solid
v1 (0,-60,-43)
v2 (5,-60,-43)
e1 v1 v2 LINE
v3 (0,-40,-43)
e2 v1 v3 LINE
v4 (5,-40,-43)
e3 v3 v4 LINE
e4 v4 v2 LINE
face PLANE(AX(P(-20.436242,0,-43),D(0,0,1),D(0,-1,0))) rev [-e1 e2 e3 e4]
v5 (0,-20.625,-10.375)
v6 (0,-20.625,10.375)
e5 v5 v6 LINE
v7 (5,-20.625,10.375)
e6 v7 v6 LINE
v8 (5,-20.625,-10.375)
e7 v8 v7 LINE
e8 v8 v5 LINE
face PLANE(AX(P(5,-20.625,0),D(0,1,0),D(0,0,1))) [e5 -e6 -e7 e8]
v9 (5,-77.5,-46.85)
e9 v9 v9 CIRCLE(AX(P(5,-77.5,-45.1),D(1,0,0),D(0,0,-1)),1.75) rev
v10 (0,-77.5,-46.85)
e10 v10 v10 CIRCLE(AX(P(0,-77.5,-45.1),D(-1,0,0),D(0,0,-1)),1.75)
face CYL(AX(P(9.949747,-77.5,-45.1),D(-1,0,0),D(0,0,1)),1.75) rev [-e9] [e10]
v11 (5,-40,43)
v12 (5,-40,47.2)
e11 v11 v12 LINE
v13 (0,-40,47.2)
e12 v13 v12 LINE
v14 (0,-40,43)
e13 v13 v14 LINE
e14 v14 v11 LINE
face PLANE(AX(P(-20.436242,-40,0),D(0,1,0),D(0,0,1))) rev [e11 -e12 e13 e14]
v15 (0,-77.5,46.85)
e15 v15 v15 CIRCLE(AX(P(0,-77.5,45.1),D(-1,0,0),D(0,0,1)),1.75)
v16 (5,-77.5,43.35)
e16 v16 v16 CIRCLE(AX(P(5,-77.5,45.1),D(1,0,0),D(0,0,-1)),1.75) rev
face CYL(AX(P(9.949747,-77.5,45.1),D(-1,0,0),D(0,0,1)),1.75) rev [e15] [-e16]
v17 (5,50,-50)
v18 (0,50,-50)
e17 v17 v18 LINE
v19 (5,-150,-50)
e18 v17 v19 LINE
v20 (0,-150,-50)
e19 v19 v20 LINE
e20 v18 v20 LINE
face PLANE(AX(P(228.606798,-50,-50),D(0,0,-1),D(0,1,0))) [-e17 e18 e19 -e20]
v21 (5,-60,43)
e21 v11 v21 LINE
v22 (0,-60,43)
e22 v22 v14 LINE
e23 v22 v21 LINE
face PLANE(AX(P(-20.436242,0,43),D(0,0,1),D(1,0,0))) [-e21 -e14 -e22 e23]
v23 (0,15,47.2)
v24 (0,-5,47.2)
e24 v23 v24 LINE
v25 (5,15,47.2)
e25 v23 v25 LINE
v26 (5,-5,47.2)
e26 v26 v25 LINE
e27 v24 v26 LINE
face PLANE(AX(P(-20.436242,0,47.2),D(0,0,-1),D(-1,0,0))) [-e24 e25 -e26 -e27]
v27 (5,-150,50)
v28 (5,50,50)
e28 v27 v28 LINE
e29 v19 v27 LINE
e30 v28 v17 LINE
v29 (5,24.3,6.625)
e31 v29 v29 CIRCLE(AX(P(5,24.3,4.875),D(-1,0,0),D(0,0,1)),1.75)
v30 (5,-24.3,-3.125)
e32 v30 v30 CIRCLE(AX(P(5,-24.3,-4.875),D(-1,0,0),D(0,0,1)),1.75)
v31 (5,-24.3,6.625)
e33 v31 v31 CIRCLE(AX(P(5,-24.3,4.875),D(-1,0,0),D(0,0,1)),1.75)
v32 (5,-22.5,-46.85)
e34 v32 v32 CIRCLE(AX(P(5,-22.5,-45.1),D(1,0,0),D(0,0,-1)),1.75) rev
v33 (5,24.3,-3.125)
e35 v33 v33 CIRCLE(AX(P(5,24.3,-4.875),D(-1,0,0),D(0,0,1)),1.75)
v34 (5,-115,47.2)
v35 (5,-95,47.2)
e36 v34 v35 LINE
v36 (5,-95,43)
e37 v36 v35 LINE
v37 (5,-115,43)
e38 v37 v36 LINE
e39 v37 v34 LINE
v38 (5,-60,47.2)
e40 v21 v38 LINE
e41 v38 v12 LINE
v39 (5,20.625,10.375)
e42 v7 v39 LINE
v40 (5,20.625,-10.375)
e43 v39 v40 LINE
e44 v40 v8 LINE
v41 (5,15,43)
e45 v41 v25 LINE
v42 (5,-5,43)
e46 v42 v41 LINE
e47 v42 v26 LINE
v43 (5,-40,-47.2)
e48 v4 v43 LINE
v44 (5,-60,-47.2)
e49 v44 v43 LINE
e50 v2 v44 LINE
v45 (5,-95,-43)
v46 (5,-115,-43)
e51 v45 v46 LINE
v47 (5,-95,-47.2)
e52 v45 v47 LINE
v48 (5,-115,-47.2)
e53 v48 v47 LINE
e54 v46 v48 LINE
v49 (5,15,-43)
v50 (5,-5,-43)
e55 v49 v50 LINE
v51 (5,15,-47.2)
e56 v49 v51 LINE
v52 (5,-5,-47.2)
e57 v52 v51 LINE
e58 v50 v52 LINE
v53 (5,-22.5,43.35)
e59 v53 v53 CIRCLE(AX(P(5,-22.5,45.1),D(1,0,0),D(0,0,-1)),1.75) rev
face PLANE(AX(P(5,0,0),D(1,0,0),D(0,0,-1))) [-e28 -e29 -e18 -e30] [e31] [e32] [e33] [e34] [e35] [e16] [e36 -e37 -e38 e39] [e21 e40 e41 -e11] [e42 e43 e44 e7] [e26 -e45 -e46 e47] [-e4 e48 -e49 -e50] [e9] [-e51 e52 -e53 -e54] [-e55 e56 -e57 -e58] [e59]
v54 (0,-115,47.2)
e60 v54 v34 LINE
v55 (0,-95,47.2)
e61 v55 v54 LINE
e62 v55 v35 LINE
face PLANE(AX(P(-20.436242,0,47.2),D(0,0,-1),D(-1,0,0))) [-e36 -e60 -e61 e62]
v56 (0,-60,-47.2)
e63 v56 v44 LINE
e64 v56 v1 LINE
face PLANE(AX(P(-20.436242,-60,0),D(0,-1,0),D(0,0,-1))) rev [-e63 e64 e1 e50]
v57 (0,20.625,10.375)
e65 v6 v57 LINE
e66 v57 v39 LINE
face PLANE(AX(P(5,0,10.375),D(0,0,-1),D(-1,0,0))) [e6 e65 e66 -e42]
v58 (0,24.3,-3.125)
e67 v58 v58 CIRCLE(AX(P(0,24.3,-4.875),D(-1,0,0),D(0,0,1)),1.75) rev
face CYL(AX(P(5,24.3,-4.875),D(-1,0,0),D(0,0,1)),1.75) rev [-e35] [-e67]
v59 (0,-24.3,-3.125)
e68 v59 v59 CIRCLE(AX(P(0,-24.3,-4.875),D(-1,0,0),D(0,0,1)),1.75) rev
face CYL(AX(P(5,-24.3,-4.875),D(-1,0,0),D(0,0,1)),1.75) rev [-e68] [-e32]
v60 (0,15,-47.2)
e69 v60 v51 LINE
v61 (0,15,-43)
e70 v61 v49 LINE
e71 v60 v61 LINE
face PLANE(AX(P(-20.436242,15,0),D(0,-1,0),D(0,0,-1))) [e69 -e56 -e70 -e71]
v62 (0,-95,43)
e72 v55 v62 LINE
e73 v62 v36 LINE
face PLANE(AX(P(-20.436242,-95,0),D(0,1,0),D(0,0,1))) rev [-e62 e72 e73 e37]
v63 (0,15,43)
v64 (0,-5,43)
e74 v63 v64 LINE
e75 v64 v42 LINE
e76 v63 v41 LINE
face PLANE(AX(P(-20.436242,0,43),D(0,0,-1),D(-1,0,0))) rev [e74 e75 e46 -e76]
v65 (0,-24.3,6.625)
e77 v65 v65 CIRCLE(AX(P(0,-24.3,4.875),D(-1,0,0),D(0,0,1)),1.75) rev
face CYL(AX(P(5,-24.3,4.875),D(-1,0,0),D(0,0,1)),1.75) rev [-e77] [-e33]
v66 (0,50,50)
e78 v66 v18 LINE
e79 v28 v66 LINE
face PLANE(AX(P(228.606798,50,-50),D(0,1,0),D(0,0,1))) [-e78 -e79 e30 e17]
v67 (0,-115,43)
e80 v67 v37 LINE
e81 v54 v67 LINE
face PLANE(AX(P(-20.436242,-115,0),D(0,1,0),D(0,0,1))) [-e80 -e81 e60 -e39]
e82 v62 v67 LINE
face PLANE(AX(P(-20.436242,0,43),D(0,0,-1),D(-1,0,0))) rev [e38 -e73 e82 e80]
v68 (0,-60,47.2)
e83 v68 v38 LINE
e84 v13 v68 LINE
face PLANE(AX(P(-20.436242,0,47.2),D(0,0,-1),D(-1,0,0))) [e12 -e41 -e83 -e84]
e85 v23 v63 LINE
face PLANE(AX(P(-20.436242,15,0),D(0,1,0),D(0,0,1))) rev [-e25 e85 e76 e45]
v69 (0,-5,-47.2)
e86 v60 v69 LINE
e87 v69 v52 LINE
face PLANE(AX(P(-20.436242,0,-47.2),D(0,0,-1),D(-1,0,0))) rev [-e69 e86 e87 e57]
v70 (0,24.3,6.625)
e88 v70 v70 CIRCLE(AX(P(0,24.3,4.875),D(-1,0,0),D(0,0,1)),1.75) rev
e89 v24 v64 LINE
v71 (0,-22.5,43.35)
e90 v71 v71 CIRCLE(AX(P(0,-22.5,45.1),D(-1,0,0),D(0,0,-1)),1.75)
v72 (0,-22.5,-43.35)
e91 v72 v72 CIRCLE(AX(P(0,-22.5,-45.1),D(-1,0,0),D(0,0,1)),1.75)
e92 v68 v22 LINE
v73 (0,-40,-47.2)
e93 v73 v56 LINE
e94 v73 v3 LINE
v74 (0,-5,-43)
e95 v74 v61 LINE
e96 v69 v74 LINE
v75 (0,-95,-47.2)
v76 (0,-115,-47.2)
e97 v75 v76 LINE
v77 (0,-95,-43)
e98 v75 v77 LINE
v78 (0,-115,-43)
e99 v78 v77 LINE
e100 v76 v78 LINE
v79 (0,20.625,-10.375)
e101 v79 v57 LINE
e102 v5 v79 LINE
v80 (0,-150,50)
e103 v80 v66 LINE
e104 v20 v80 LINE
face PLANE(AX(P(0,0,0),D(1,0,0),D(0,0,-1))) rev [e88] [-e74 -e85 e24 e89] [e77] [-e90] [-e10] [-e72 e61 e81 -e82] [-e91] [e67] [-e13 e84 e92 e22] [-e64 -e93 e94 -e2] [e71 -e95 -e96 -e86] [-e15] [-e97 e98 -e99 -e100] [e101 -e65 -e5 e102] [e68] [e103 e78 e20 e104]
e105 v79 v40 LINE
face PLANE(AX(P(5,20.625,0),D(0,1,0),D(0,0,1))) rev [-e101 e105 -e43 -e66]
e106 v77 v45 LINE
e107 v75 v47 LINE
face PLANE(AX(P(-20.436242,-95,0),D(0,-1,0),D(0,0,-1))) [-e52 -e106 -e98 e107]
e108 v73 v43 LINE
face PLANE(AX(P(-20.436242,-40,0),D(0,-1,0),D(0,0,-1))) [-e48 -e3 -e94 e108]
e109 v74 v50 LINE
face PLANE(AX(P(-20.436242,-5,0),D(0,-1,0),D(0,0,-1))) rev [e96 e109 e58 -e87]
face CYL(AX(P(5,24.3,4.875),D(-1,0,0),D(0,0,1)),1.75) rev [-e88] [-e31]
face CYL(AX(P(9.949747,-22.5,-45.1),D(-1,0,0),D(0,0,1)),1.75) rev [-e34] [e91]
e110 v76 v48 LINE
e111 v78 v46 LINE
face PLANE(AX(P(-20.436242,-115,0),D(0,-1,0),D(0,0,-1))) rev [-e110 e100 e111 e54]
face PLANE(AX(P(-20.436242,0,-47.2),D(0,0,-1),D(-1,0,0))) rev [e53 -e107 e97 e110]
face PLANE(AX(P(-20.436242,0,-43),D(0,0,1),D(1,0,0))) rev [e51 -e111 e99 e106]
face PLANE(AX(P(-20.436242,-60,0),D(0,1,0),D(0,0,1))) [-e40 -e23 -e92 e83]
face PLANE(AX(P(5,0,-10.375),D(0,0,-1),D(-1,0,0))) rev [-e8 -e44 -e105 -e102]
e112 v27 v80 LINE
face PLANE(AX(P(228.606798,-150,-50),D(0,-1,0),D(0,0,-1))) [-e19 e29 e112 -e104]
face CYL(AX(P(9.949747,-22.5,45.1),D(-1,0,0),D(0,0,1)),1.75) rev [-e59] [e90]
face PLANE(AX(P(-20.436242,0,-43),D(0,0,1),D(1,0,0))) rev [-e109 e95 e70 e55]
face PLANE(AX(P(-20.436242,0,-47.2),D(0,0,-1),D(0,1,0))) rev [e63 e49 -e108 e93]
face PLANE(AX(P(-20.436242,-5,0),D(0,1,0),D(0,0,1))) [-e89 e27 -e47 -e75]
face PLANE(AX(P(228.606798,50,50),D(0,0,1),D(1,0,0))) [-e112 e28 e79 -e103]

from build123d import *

# Parameters (mm, degrees)
CUT_EXTRUDE1_START     = -5
CUT_EXTRUDE1_OUTLINE_R = 1.75
CUT_EXTRUDE1_OUTLINE_W = 20.75
CUT_EXTRUDE1_OUTLINE_H = 41.25
CUT_EXTRUDE1_DEPTH     = 5
BOSS_EXTRUDE1_START    = -5
BOSS_EXTRUDE1_DEPTH    = 5
SKETCH4_W              = 30
SKETCH4_H              = 60
BOSS_EXTRUDE2_DEPTH    = 5
CUT_EXTRUDE2_REACH     = 160.193
SKETCH5_W              = 4.2
SKETCH5_H              = 20
CUT_EXTRUDE3_REACH     = 160.193
SKETCH6_R              = 1.75


with BuildPart() as part:
    # Cut-Extrude1: read off the stored shape, not the designer's step
    # Cut-Extrude1 outline → Cut-Extrude1 (new body)
    with BuildSketch(Plane(origin=(5, 0, 0), x_dir=(0, 0, -1), z_dir=(1, 0, 0)).offset(CUT_EXTRUDE1_START)):
        with BuildLine():
            Line((-6.17, -30), (6.17, -30))
            ThreePointArc((6.17, -30), (12.413752878, -27.413752878), (15, -21.17))
            Line((15, -21.17), (15, 21.17))
            ThreePointArc((15, 21.17), (12.413752878, 27.413752878), (6.17, 30))
            Line((6.17, 30), (-6.17, 30))
            ThreePointArc((-6.17, 30), (-12.413752878, 27.413752878), (-15, 21.17))
            Line((-15, 21.17), (-15, -21.17))
            ThreePointArc((-15, -21.17), (-12.413752878, -27.413752878), (-6.17, -30))
        make_face()
        with Locations((-4.875, -24.3)):
            Circle(CUT_EXTRUDE1_OUTLINE_R, mode=Mode.SUBTRACT)
        with Locations((4.875, -24.3)):
            Circle(CUT_EXTRUDE1_OUTLINE_R, mode=Mode.SUBTRACT)
        with Locations((-4.875, 24.3)):
            Circle(CUT_EXTRUDE1_OUTLINE_R, mode=Mode.SUBTRACT)
        Rectangle(CUT_EXTRUDE1_OUTLINE_W, CUT_EXTRUDE1_OUTLINE_H, mode=Mode.SUBTRACT)
        with Locations((4.875, 24.3)):
            Circle(CUT_EXTRUDE1_OUTLINE_R, mode=Mode.SUBTRACT)
    extrude(amount=CUT_EXTRUDE1_DEPTH)

    # Sketch2 → Boss-Extrude1 (add)
    with BuildSketch(Plane(origin=(5, 0, 0), x_dir=(0, 0, -1), z_dir=(1, 0, 0)).offset(BOSS_EXTRUDE1_START)):
        with BuildLine():
            Line((10.375, -20.625), (6.17, -20.625))
            Line((6.17, -20.625), (6.17, -21.93080825))
            Line((6.17, -21.93080825), (7.268440243, -21.93080825))
            Line((7.268440243, -21.93080825), (7.268440243, -27.341819789))
            Line((7.268440243, -27.341819789), (6.17, -27.341819789))
            Line((6.17, -27.341819789), (6.17, -30))
            ThreePointArc((6.17, -30), (12.413752878, -27.413752878), (15, -21.17))
            Line((15, -21.17), (15, 21.17))
            ThreePointArc((15, 21.17), (12.413752878, 27.413752878), (6.17, 30))
            Line((6.17, 30), (6.17, 26.982507006))
            Line((6.17, 26.982507006), (7.710578553, 26.982507006))
            Line((7.710578553, 26.982507006), (7.710578553, 21.584637872))
            Line((7.710578553, 21.584637872), (6.17, 21.584637872))
            Line((6.17, 21.584637872), (6.17, 20.625))
            Line((6.17, 20.625), (10.375, 20.625))
            Line((10.375, 20.625), (10.375, -20.625))
        make_face()
        with BuildLine():
            Line((-8.472684232, -21.93080825), (-6.17, -21.93080825))
            Line((-6.17, -21.93080825), (-6.17, -20.625))
            Line((-6.17, -20.625), (-10.375, -20.625))
            Line((-10.375, -20.625), (-10.375, 20.625))
            Line((-10.375, 20.625), (-6.17, 20.625))
            Line((-6.17, 20.625), (-6.17, 21.584637872))
            Line((-6.17, 21.584637872), (-7.710578553, 21.584637872))
            Line((-7.710578553, 21.584637872), (-7.710578553, 26.982507006))
            Line((-7.710578553, 26.982507006), (-6.17, 26.982507006))
            Line((-6.17, 26.982507006), (-6.17, 30))
            ThreePointArc((-6.17, 30), (-12.413752878, 27.413752878), (-15, 21.17))
            Line((-15, 21.17), (-15, -21.17))
            ThreePointArc((-15, -21.17), (-12.413752878, -27.413752878), (-6.17, -30))
            Line((-6.17, -30), (-6.17, -27.341819789))
            Line((-6.17, -27.341819789), (-8.472684232, -27.341819789))
            Line((-8.472684232, -27.341819789), (-8.472684232, -21.93080825))
        make_face()
        with BuildLine():
            Line((-15, 30), (-15, 21.17))
            ThreePointArc((-15, 21.17), (-12.413752878, 27.413752878), (-6.17, 30))
            Line((-6.17, 30), (-15, 30))
        make_face()
        with BuildLine():
            Line((15, 30), (6.17, 30))
            ThreePointArc((6.17, 30), (12.413752878, 27.413752878), (15, 21.17))
            Line((15, 21.17), (15, 30))
        make_face()
        with BuildLine():
            ThreePointArc((15, -21.17), (12.413752878, -27.413752878), (6.17, -30))
            Line((6.17, -30), (15, -30))
            Line((15, -30), (15, -21.17))
        make_face()
        with BuildLine():
            Line((-15, -30), (-6.17, -30))
            ThreePointArc((-6.17, -30), (-12.413752878, -27.413752878), (-15, -21.17))
            Line((-15, -21.17), (-15, -30))
        make_face()
    extrude(amount=BOSS_EXTRUDE1_DEPTH)

    # Sketch4 → Boss-Extrude2 (add)
    with BuildSketch(Plane.ZY):
        Polygon((-50, 50), (50, 50), (50, -50), (50, -150), (-50, -150), (-50, -50), align=None)
        Rectangle(SKETCH4_W, SKETCH4_H, mode=Mode.SUBTRACT)
    extrude(amount=-BOSS_EXTRUDE2_DEPTH)

    # Sketch5 → Cut-Extrude2 (cut, up to next)
    with BuildSketch(Plane(origin=(5, 0, 0), x_dir=(0, 0, -1), z_dir=(1, 0, 0)), mode=Mode.PRIVATE) as cut_extrude2_sk1:
        with Locations((45.1, -105)):
            Rectangle(SKETCH5_W, SKETCH5_H)
    cut_extrude2_tool1 = extrude(cut_extrude2_sk1.sketch, amount=-CUT_EXTRUDE2_REACH, mode=Mode.PRIVATE) & part.part
    # Sketch5 → Cut-Extrude2 (cut, up to next)
    with BuildSketch(Plane(origin=(5, 0, 0), x_dir=(0, 0, -1), z_dir=(1, 0, 0)), mode=Mode.PRIVATE) as cut_extrude2_sk2:
        with Locations((45.1, -50)):
            Rectangle(SKETCH5_W, SKETCH5_H)
    cut_extrude2_tool2 = extrude(cut_extrude2_sk2.sketch, amount=-CUT_EXTRUDE2_REACH, mode=Mode.PRIVATE) & part.part
    # Sketch5 → Cut-Extrude2 (cut, up to next)
    with BuildSketch(Plane(origin=(5, 0, 0), x_dir=(0, 0, -1), z_dir=(1, 0, 0)), mode=Mode.PRIVATE) as cut_extrude2_sk3:
        with Locations((45.1, 5)):
            Rectangle(SKETCH5_W, SKETCH5_H)
    cut_extrude2_tool3 = extrude(cut_extrude2_sk3.sketch, amount=-CUT_EXTRUDE2_REACH, mode=Mode.PRIVATE) & part.part
    # Sketch5 → Cut-Extrude2 (cut, up to next)
    with BuildSketch(Plane(origin=(5, 0, 0), x_dir=(0, 0, -1), z_dir=(1, 0, 0)), mode=Mode.PRIVATE) as cut_extrude2_sk4:
        with Locations((-45.1, 5)):
            Rectangle(SKETCH5_W, SKETCH5_H)
    cut_extrude2_tool4 = extrude(cut_extrude2_sk4.sketch, amount=-CUT_EXTRUDE2_REACH, mode=Mode.PRIVATE) & part.part
    # Sketch5 → Cut-Extrude2 (cut, up to next)
    with BuildSketch(Plane(origin=(5, 0, 0), x_dir=(0, 0, -1), z_dir=(1, 0, 0)), mode=Mode.PRIVATE) as cut_extrude2_sk5:
        with Locations((-45.1, -50)):
            Rectangle(SKETCH5_W, SKETCH5_H)
    cut_extrude2_tool5 = extrude(cut_extrude2_sk5.sketch, amount=-CUT_EXTRUDE2_REACH, mode=Mode.PRIVATE) & part.part
    # Sketch5 → Cut-Extrude2 (cut, up to next)
    with BuildSketch(Plane(origin=(5, 0, 0), x_dir=(0, 0, -1), z_dir=(1, 0, 0)), mode=Mode.PRIVATE) as cut_extrude2_sk6:
        with Locations((-45.1, -105)):
            Rectangle(SKETCH5_W, SKETCH5_H)
    cut_extrude2_tool6 = extrude(cut_extrude2_sk6.sketch, amount=-CUT_EXTRUDE2_REACH, mode=Mode.PRIVATE) & part.part
    add(cut_extrude2_tool1.solids().sort_by_distance((5, -105, -45.1))[0], mode=Mode.SUBTRACT)
    add(cut_extrude2_tool2.solids().sort_by_distance((5, -50, -45.1))[0], mode=Mode.SUBTRACT)
    add(cut_extrude2_tool3.solids().sort_by_distance((5, 5, -45.1))[0], mode=Mode.SUBTRACT)
    add(cut_extrude2_tool4.solids().sort_by_distance((5, 5, 45.1))[0], mode=Mode.SUBTRACT)
    add(cut_extrude2_tool5.solids().sort_by_distance((5, -50, 45.1))[0], mode=Mode.SUBTRACT)
    add(cut_extrude2_tool6.solids().sort_by_distance((5, -105, 45.1))[0], mode=Mode.SUBTRACT)

    # Sketch6 → Cut-Extrude3 (cut, up to next)
    with BuildSketch(Plane.ZY, mode=Mode.PRIVATE) as cut_extrude3_sk1:
        with Locations((45.1, -77.5)):
            Circle(SKETCH6_R)
    cut_extrude3_tool1 = extrude(cut_extrude3_sk1.sketch, amount=-CUT_EXTRUDE3_REACH, mode=Mode.PRIVATE) & part.part
    # Sketch6 → Cut-Extrude3 (cut, up to next)
    with BuildSketch(Plane.ZY, mode=Mode.PRIVATE) as cut_extrude3_sk2:
        with Locations(Location((-45.1, -77.5, 0), (0, 0, 180))):
            Circle(SKETCH6_R)
    cut_extrude3_tool2 = extrude(cut_extrude3_sk2.sketch, amount=-CUT_EXTRUDE3_REACH, mode=Mode.PRIVATE) & part.part
    # Sketch6 → Cut-Extrude3 (cut, up to next)
    with BuildSketch(Plane.ZY, mode=Mode.PRIVATE) as cut_extrude3_sk3:
        with Locations((-45.1, -22.5)):
            Circle(SKETCH6_R)
    cut_extrude3_tool3 = extrude(cut_extrude3_sk3.sketch, amount=-CUT_EXTRUDE3_REACH, mode=Mode.PRIVATE) & part.part
    # Sketch6 → Cut-Extrude3 (cut, up to next)
    with BuildSketch(Plane.ZY, mode=Mode.PRIVATE) as cut_extrude3_sk4:
        with Locations(Location((45.1, -22.5, 0), (0, 0, 180))):
            Circle(SKETCH6_R)
    cut_extrude3_tool4 = extrude(cut_extrude3_sk4.sketch, amount=-CUT_EXTRUDE3_REACH, mode=Mode.PRIVATE) & part.part
    add(cut_extrude3_tool1.solids().sort_by_distance((0, -77.5, 45.1))[0], mode=Mode.SUBTRACT)
    add(cut_extrude3_tool2.solids().sort_by_distance((0, -77.5, -45.1))[0], mode=Mode.SUBTRACT)
    add(cut_extrude3_tool3.solids().sort_by_distance((0, -22.5, -45.1))[0], mode=Mode.SUBTRACT)
    add(cut_extrude3_tool4.solids().sort_by_distance((0, -22.5, 45.1))[0], mode=Mode.SUBTRACT)


solid = part.part
